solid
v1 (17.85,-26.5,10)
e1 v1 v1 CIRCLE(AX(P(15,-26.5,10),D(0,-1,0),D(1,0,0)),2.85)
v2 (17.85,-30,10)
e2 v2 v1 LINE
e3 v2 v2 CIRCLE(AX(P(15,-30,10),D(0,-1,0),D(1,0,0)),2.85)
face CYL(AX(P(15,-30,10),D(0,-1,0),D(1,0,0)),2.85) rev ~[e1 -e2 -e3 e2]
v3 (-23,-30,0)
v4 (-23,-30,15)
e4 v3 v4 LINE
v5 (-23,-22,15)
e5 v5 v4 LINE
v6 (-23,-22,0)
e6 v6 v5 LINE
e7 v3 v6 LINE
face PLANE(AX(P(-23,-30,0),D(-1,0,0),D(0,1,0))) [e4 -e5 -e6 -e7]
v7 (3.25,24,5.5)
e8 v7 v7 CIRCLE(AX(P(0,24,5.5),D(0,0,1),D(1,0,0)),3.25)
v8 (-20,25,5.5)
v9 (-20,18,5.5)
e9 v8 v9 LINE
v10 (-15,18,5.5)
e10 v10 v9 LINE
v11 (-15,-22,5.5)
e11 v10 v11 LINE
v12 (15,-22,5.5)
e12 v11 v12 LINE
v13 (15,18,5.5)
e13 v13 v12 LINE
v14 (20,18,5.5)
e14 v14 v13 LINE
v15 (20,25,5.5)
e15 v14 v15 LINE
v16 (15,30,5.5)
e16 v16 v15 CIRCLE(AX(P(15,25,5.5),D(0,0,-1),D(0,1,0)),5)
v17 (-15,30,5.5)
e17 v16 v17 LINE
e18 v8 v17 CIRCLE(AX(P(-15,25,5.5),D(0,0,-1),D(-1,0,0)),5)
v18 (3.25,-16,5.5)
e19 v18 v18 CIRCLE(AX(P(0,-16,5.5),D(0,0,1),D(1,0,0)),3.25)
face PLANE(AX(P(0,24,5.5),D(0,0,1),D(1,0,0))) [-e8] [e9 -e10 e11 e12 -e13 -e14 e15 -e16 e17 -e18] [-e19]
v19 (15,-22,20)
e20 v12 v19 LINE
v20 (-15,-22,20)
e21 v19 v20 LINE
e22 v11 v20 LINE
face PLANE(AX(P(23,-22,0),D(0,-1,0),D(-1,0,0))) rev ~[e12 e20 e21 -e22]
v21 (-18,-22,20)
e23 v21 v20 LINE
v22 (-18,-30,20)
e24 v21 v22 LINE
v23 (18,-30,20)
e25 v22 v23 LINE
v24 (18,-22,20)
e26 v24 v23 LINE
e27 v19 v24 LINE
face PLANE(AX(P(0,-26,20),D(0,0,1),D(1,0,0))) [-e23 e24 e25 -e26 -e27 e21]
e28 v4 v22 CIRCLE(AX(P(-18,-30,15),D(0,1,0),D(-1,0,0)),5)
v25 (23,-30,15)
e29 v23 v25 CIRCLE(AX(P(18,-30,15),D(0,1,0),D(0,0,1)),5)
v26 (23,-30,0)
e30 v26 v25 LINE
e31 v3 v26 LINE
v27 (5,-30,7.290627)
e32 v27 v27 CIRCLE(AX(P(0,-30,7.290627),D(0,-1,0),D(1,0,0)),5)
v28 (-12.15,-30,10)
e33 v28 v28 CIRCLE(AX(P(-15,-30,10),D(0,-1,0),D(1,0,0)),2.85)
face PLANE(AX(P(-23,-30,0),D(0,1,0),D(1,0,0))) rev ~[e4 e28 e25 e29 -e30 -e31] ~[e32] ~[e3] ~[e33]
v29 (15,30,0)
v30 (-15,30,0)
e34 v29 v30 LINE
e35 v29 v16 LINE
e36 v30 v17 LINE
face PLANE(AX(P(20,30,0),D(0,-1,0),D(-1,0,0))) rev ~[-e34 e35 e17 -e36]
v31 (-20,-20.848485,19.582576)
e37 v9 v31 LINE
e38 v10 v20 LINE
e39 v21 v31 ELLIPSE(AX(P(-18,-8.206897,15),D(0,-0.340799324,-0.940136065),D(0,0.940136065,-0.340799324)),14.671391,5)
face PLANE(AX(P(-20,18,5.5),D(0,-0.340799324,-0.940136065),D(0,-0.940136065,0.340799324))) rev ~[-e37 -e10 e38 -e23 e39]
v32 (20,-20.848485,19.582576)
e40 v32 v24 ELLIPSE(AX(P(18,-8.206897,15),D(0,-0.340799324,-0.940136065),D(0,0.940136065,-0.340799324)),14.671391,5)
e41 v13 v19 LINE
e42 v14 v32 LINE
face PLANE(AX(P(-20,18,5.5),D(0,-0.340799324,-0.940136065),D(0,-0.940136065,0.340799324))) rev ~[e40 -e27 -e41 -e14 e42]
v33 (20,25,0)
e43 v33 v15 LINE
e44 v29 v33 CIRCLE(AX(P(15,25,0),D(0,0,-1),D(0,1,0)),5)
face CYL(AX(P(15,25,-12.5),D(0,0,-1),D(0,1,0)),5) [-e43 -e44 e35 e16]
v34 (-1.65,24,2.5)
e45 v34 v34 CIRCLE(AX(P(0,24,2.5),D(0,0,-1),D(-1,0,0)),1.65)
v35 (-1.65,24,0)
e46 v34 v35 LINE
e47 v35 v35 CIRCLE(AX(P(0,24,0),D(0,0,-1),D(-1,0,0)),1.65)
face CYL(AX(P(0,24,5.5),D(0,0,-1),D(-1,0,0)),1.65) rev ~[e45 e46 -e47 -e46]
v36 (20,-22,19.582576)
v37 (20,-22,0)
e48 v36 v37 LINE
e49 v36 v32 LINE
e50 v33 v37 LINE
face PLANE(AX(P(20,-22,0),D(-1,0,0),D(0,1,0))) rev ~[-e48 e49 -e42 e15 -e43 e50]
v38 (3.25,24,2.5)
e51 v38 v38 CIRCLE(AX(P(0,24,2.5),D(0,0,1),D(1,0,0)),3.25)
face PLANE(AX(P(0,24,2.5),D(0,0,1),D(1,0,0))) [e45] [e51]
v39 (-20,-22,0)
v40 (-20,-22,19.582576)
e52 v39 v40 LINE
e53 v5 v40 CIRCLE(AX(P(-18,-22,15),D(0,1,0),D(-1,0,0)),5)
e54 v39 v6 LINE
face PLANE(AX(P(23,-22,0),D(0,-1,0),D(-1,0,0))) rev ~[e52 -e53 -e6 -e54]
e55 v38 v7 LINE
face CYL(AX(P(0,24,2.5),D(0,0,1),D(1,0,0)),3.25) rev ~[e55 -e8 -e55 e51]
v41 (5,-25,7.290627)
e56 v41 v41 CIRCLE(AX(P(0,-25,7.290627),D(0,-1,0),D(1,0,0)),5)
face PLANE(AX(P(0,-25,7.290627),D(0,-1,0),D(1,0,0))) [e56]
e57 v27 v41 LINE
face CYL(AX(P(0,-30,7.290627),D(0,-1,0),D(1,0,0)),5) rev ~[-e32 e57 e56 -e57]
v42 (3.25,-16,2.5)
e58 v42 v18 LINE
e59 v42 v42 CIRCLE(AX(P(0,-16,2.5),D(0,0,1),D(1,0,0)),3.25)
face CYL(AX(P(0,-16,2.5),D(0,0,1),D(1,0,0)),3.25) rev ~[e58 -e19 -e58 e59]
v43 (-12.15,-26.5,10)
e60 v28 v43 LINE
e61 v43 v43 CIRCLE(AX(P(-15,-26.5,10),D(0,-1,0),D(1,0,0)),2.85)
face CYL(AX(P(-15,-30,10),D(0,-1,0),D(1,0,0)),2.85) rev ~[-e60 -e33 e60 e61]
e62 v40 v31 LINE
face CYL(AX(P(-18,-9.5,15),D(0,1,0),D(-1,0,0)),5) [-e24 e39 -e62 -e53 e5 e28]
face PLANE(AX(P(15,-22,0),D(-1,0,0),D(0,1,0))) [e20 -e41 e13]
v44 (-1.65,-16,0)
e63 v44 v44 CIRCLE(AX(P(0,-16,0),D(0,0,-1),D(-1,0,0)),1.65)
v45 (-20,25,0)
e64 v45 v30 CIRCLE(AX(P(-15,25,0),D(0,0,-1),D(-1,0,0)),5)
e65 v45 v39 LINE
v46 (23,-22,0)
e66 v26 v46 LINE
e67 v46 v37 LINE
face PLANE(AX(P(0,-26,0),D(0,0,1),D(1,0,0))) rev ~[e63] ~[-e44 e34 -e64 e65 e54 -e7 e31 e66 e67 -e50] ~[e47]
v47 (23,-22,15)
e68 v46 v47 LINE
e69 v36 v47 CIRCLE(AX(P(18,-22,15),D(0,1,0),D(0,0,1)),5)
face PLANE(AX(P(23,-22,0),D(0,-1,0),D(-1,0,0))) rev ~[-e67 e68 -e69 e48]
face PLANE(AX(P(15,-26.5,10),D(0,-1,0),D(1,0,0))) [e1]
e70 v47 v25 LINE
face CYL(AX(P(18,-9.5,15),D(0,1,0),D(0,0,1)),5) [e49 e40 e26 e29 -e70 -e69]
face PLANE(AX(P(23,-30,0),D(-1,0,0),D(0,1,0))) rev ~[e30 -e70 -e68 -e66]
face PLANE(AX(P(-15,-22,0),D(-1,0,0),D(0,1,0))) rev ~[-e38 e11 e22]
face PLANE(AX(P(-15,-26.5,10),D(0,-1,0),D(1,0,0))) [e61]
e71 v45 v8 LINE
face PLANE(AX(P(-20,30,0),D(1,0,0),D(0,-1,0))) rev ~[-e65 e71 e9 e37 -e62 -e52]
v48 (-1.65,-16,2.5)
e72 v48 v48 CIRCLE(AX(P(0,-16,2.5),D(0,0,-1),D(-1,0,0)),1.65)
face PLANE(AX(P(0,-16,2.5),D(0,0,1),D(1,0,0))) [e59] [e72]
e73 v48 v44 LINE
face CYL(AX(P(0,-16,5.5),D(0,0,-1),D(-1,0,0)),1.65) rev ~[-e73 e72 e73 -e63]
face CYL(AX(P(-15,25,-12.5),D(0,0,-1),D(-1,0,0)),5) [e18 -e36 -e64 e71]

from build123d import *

# Parameters (mm, degrees)
F0_W           = 3
F0_H           = 8
F1_DEPTH       = 20
F0_W_2         = 30
F0_H_2         = 12
F0_H_3         = 40
F0_W_3         = 5
F2_DEPTH       = 5.5
F3_DEPTH       = 20
F5_DEPTH       = 43.001
F7_D           = 3.3
F7_DEPTH       = 13.5002857143
F7_CBORE_D     = 6.5
F7_CBORE_DEPTH = 3
F7_TIP         = 0.9914200214
F8_R           = 5
F9_DEPTH       = 5
F8_R_2         = 2.85
F10_DEPTH      = 3.5
F11_T1_DEPTH   = 30.5
F11_T3_DEPTH   = 33


# Not quite as in the source:
# - a fillet or chamfer that OpenCascade refuses, or shapes differently, is made with other operations: its cross-section is extruded or revolved along the edge and cut away or added


with BuildPart() as f1:
    # F0 (on Top) → F1 (new body)
    with BuildSketch(Plane.XY):
        Polygon((20, -30), (20, -22), (15, -22), (-15, -22), (-20, -22), (-20, -30), align=None)
        with Locations((-21.5, -26)):
            Rectangle(F0_W, F0_H)
        with Locations((21.5, -26)):
            Rectangle(F0_W, F0_H)
    extrude(amount=F1_DEPTH)

    # F0 (on Top) → F2 (join)
    with BuildSketch(Plane.XY):
        with Locations((0, 24)):
            Rectangle(F0_W_2, F0_H_2)
        with Locations((0, -2)):
            Rectangle(F0_W_2, F0_H_3)
        with Locations((-17.5, 24)):
            Rectangle(F0_W_3, F0_H_2)
        with Locations((-17.5, -2)):
            Rectangle(F0_W_3, F0_H_3)
        with Locations((17.5, 24)):
            Rectangle(F0_W_3, F0_H_2)
        with Locations((17.5, -2)):
            Rectangle(F0_W_3, F0_H_3)
    extrude(amount=F2_DEPTH)

    # F0 (on Top) → F3 (join)
    with BuildSketch(Plane.XY):
        with Locations((-17.5, -2)):
            Rectangle(F0_W_3, F0_H_3)
        with Locations((17.5, -2)):
            Rectangle(F0_W_3, F0_H_3)
    extrude(amount=F3_DEPTH)

    # F4 (on face) → F5 (cut, through all)
    with BuildSketch(Plane(origin=(-20, 0, 0), x_dir=(0, -1, 0), z_dir=(-1, 0, 0))):
        Polygon((-18, 20), (-18, 5.5), (22, 20), align=None)
    extrude(amount=-F5_DEPTH, mode=Mode.SUBTRACT)

    # F7
    with Locations(Plane.XY.offset(5.5)):
        with Locations((0, 24), (0, -16)):
            CounterBoreHole(F7_D / 2, F7_CBORE_D / 2, F7_CBORE_DEPTH, depth=F7_DEPTH)
            with Locations((0, 0, -(F7_DEPTH + F7_TIP / 2))):  # 118° drill point
                Cone(0, F7_D / 2, F7_TIP, mode=Mode.SUBTRACT)

    # F8 (on face) → F9 (cut)
    with BuildSketch(Plane.XZ.offset(30)):
        with Locations((0, 7.2906266057)):
            Circle(F8_R)
    extrude(amount=-F9_DEPTH, mode=Mode.SUBTRACT)

    # F8 (on face) → F10 (cut)
    with BuildSketch(Plane.XZ.offset(30)):
        with Locations((-15, 10)):
            Circle(F8_R_2)
        with Locations((15, 10)):
            Circle(F8_R_2)
    extrude(amount=-F10_DEPTH, mode=Mode.SUBTRACT)

    # F11: fillet of radius 5 on 4 edges, made by hand

    # F11_s2 → F11_t1 (cut)
    with BuildSketch(Plane.XY.offset(-12.5)):
        with BuildLine():
            ThreePointArc((15, 30), (18.5355339059, 28.5355339059), (20, 25))
            Line((20, 25), (20, 30))
            Line((20, 30), (15, 30))
        make_face()
        with BuildLine():
            ThreePointArc((-20, 25), (-18.5355339059, 28.5355339059), (-15, 30))
            Line((-15, 30), (-20, 30))
            Line((-20, 30), (-20, 25))
        make_face()
    extrude(amount=F11_T1_DEPTH, mode=Mode.SUBTRACT)

    # F11_s4 → F11_t3 (cut)
    with BuildSketch(Plane.XZ.offset(9.5)):
        with BuildLine():
            ThreePointArc((-23, 15), (-21.5355339059, 18.5355339059), (-18, 20))
            Line((-18, 20), (-23, 20))
            Line((-23, 20), (-23, 15))
        make_face()
        with BuildLine():
            ThreePointArc((18, 20), (21.5355339059, 18.5355339059), (23, 15))
            Line((23, 15), (23, 20))
            Line((23, 20), (18, 20))
        make_face()
    extrude(amount=F11_T3_DEPTH, mode=Mode.SUBTRACT)


solid = f1.part
